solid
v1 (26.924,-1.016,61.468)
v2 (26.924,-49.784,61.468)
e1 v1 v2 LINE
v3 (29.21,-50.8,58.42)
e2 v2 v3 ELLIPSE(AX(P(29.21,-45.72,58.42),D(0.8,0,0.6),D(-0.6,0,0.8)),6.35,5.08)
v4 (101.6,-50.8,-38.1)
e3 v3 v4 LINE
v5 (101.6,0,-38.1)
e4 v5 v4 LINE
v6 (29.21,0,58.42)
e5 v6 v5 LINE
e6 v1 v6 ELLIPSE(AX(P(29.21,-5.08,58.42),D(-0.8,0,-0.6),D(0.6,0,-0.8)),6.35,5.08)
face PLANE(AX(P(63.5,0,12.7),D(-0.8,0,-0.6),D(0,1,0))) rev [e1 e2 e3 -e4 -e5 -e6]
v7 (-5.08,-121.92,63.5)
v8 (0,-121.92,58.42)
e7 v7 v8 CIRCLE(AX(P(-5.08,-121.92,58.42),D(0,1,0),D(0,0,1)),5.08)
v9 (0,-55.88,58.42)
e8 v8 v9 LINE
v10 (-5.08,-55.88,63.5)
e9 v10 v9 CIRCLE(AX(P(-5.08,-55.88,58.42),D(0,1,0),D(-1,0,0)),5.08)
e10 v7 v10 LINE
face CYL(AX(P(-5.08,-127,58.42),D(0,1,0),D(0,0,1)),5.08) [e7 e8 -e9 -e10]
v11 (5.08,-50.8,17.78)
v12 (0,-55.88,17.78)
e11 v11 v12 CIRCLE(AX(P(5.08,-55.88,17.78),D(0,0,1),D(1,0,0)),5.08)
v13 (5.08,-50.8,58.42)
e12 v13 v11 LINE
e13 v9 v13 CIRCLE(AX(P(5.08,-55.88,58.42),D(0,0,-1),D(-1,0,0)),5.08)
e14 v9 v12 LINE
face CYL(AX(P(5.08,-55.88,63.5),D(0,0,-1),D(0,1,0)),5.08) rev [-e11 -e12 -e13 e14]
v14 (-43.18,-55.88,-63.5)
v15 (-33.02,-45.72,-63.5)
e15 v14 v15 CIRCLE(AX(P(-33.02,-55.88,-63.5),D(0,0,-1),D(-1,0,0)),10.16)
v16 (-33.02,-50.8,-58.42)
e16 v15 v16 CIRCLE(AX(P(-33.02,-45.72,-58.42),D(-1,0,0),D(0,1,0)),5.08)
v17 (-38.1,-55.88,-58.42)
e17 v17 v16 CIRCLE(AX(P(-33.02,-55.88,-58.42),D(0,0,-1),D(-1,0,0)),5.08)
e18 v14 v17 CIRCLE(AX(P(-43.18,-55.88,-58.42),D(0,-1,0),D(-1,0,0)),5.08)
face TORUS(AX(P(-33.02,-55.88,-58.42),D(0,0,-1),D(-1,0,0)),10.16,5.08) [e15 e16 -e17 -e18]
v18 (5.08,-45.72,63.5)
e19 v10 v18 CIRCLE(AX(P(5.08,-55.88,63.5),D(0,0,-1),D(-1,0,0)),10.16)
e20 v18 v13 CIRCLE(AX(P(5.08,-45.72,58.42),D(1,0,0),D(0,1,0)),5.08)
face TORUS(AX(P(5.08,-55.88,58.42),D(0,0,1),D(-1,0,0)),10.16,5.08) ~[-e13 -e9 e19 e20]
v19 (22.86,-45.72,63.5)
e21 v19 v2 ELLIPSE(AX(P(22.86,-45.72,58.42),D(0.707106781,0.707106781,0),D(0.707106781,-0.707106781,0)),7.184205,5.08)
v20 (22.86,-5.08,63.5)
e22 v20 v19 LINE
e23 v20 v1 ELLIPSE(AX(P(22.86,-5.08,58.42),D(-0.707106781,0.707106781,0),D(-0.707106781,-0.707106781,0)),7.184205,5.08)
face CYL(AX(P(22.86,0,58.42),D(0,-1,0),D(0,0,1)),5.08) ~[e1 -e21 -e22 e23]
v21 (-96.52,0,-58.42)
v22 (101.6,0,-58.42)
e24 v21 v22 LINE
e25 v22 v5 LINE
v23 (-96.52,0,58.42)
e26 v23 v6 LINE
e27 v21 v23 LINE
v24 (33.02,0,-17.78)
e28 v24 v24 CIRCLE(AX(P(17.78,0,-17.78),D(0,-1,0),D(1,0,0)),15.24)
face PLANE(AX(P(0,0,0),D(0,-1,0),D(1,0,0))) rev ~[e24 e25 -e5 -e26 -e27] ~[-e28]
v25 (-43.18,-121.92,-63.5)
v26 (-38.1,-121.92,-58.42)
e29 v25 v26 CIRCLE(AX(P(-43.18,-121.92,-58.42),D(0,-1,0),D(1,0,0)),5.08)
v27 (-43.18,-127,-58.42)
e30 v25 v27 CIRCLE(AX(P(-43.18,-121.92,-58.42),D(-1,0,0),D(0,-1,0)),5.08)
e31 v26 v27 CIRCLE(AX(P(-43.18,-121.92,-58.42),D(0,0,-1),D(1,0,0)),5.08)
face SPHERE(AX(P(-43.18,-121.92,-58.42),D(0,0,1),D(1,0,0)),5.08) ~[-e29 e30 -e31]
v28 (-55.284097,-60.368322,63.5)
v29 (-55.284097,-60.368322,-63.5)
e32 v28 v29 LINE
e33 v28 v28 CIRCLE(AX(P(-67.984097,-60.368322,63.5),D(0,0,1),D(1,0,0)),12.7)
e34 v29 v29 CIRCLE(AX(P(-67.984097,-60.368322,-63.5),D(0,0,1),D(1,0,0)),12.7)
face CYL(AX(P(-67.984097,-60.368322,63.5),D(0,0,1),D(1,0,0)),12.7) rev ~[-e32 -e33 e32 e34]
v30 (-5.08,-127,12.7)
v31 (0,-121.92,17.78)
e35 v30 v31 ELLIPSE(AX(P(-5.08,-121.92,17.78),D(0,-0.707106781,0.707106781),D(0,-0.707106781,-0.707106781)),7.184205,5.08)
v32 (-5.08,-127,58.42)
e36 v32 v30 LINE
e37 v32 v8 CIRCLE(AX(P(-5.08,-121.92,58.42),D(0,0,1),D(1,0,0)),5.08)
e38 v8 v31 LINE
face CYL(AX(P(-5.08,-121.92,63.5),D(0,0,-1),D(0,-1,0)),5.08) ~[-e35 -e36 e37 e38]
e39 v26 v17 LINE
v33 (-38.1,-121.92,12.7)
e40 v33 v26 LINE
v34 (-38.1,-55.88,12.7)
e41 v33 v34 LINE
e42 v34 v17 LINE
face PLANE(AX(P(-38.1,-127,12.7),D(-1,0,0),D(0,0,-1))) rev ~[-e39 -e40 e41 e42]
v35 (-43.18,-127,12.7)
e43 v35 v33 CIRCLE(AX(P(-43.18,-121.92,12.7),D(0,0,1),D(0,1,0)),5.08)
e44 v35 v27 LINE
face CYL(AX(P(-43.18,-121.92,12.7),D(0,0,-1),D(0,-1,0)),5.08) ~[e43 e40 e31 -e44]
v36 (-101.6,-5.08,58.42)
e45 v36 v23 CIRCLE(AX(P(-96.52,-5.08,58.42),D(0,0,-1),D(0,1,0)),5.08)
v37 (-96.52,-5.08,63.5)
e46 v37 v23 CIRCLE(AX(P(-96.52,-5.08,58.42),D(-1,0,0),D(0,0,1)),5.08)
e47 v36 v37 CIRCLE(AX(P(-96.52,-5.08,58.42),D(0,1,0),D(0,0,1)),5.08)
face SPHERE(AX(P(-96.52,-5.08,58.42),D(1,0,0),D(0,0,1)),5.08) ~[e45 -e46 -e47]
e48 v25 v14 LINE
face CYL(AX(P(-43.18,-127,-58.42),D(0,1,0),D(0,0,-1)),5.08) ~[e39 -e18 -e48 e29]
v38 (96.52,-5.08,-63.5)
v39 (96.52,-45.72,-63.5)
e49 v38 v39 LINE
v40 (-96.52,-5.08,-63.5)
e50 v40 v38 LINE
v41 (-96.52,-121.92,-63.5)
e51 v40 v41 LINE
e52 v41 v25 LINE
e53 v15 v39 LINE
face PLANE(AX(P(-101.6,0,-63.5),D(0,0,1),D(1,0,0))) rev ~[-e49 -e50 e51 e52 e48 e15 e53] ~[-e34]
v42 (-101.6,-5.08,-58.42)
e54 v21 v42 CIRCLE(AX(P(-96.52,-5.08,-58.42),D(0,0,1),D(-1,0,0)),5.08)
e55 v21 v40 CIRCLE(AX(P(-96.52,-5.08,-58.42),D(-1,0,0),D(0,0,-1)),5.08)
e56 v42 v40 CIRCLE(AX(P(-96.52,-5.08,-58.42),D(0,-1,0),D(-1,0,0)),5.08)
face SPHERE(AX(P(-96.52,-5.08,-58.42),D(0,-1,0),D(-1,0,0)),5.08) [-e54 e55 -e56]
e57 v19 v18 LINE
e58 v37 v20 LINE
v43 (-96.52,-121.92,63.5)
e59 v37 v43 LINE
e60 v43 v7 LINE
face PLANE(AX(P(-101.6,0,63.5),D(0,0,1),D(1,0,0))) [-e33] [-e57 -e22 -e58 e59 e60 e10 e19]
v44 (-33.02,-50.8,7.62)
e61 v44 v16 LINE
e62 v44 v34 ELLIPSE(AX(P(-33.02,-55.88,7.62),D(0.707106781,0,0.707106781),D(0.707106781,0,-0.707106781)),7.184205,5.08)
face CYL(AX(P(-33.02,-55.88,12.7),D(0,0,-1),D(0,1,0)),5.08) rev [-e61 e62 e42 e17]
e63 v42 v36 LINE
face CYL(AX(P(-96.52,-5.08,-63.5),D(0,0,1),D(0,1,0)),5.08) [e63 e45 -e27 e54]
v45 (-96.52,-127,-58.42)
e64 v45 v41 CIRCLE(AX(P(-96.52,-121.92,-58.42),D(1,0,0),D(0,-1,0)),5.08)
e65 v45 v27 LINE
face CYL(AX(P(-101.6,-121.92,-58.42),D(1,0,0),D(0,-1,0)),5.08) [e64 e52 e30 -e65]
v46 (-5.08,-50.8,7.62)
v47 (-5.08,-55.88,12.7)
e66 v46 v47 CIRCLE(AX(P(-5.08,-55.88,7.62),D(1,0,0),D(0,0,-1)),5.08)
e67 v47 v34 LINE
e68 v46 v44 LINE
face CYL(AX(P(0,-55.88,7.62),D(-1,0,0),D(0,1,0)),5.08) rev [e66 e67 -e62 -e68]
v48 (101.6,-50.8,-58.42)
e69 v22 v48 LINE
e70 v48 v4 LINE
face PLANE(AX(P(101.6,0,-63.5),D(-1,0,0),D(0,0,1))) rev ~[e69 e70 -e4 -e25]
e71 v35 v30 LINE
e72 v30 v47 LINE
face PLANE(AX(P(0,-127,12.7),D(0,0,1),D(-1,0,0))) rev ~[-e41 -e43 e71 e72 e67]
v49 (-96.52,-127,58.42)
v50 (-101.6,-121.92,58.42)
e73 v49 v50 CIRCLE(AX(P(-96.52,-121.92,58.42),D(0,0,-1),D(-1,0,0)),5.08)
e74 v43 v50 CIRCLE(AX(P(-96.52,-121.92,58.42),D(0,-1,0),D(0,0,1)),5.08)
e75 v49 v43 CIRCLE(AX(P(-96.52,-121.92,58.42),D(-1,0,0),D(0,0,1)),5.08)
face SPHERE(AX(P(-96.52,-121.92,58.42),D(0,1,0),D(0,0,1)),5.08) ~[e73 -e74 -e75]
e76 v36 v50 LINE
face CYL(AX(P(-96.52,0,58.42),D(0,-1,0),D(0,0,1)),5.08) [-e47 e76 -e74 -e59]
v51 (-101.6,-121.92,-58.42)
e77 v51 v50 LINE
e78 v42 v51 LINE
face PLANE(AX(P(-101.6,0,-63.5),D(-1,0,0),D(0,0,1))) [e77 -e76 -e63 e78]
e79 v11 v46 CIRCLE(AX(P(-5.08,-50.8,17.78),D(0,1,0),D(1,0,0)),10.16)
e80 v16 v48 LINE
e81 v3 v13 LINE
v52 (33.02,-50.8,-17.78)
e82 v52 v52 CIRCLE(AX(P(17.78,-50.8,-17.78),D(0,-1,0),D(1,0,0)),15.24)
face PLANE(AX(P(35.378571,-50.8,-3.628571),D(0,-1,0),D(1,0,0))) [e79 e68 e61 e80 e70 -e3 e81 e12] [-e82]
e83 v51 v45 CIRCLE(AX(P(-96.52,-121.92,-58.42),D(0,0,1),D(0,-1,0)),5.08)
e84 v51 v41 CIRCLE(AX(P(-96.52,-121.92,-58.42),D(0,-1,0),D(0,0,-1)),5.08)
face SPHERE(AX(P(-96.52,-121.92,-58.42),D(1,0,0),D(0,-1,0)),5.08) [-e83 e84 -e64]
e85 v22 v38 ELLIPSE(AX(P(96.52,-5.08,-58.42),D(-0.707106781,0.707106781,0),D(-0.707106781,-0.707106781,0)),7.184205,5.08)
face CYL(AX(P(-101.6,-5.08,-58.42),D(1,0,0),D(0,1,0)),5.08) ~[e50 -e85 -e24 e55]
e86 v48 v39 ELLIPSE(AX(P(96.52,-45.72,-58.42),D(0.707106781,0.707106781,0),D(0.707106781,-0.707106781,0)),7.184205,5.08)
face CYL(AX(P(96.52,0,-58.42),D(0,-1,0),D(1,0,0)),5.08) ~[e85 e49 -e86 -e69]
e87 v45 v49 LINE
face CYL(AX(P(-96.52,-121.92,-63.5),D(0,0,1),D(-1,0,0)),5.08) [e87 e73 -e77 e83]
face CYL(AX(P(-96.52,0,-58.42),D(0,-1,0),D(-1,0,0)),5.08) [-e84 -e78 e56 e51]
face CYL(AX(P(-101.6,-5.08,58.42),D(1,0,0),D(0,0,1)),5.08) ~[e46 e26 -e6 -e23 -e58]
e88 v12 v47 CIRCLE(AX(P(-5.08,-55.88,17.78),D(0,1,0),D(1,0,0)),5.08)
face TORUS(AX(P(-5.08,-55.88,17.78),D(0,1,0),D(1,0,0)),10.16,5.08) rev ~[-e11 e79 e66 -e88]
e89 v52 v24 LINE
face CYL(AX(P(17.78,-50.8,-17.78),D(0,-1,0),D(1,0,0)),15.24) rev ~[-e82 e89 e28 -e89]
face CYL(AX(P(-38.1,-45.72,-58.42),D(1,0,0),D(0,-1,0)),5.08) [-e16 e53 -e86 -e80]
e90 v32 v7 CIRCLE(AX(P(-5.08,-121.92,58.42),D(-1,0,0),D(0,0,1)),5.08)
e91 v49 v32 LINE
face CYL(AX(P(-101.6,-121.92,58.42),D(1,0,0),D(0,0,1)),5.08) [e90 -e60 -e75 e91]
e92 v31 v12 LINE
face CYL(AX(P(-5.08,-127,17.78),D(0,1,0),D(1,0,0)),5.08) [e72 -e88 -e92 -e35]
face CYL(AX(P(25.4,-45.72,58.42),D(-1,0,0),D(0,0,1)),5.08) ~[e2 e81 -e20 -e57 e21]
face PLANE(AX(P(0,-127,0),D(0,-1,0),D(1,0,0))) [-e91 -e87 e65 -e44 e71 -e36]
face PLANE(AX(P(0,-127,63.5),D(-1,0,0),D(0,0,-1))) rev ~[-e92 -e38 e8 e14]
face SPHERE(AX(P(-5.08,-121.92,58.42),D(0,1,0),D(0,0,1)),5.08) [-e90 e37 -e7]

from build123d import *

# Parameters (mm, degrees)
F0_W     = 203.2
F0_H     = 127
F1_DEPTH = 127
F3_DEPTH = 76.2
F4_SIZE2 = 101.6
F4_SIZE  = 76.2
F5_R     = 5.08
F6_R     = 15.24
F7_DEPTH = 50.8
F8_R     = 12.7
F9_DEPTH = 127


with BuildPart() as f1:
    # F0 (on Front) → F1 (new body)
    with BuildSketch(Plane.XZ):
        Rectangle(F0_W, F0_H)
    extrude(amount=F1_DEPTH)

    # F2 (on face) → F3 (cut)
    with BuildSketch(Plane.XZ.offset(127)):
        Polygon((101.6, 63.5), (0, 63.5), (0, 12.7), (-38.1, 12.7), (-38.1, -63.5), (101.6, -63.5), align=None)
    extrude(amount=-F3_DEPTH, mode=Mode.SUBTRACT)

    # F4
    f4_edges = [f1.edges().sort_by_distance(p)[0] for p in [
        (101.6, -25.4, 63.5),
    ]]
    f4_side = f1.faces().sort_by_distance((-21.771429, -52.614286, 63.5))[0]
    chamfer(f4_edges, length=F4_SIZE, length2=F4_SIZE2, reference=f4_side)

    # F5
    f5_edges = [f1.edges().sort_by_distance(p)[0] for p in [
        (0, -88.9, 63.5),
        (12.7, -50.8, 63.5),
        (25.4, -25.4, 63.5),
        (-38.1, 0, 63.5),
        (-101.6, -63.5, 63.5),
        (-50.8, -127, 63.5),
        (0, -127, 38.1),
        (0, -88.9, 12.7),
        (0, -50.8, 38.1),
        (-38.1, -50.8, -25.4),
        (-38.1, -127, -25.4),
        (-38.1, -88.9, -63.5),
        (-69.85, -127, -63.5),
        (-101.6, -127, 0),
        (31.75, -50.8, -63.5),
        (101.6, -25.4, -63.5),
        (-101.6, -63.5, -63.5),
        (-101.6, 0, 0),
        (0, 0, -63.5),
        (-19.05, -50.8, 12.7),
    ]]
    fillet(f5_edges, radius=F5_R)

    # F6 (on face) → F7 (cut, through all)
    with BuildSketch(Plane.XZ.offset(50.8)):
        with Locations((17.78, -17.78)):
            Circle(F6_R)
    extrude(amount=-F7_DEPTH, mode=Mode.SUBTRACT)

    # F8 (on face) → F9 (cut, through all)
    with BuildSketch(Plane.XY.offset(63.5)):
        with Locations((-67.9840967059, -60.368321836)):
            Circle(F8_R)
    extrude(amount=-F9_DEPTH, mode=Mode.SUBTRACT)


solid = f1.part
